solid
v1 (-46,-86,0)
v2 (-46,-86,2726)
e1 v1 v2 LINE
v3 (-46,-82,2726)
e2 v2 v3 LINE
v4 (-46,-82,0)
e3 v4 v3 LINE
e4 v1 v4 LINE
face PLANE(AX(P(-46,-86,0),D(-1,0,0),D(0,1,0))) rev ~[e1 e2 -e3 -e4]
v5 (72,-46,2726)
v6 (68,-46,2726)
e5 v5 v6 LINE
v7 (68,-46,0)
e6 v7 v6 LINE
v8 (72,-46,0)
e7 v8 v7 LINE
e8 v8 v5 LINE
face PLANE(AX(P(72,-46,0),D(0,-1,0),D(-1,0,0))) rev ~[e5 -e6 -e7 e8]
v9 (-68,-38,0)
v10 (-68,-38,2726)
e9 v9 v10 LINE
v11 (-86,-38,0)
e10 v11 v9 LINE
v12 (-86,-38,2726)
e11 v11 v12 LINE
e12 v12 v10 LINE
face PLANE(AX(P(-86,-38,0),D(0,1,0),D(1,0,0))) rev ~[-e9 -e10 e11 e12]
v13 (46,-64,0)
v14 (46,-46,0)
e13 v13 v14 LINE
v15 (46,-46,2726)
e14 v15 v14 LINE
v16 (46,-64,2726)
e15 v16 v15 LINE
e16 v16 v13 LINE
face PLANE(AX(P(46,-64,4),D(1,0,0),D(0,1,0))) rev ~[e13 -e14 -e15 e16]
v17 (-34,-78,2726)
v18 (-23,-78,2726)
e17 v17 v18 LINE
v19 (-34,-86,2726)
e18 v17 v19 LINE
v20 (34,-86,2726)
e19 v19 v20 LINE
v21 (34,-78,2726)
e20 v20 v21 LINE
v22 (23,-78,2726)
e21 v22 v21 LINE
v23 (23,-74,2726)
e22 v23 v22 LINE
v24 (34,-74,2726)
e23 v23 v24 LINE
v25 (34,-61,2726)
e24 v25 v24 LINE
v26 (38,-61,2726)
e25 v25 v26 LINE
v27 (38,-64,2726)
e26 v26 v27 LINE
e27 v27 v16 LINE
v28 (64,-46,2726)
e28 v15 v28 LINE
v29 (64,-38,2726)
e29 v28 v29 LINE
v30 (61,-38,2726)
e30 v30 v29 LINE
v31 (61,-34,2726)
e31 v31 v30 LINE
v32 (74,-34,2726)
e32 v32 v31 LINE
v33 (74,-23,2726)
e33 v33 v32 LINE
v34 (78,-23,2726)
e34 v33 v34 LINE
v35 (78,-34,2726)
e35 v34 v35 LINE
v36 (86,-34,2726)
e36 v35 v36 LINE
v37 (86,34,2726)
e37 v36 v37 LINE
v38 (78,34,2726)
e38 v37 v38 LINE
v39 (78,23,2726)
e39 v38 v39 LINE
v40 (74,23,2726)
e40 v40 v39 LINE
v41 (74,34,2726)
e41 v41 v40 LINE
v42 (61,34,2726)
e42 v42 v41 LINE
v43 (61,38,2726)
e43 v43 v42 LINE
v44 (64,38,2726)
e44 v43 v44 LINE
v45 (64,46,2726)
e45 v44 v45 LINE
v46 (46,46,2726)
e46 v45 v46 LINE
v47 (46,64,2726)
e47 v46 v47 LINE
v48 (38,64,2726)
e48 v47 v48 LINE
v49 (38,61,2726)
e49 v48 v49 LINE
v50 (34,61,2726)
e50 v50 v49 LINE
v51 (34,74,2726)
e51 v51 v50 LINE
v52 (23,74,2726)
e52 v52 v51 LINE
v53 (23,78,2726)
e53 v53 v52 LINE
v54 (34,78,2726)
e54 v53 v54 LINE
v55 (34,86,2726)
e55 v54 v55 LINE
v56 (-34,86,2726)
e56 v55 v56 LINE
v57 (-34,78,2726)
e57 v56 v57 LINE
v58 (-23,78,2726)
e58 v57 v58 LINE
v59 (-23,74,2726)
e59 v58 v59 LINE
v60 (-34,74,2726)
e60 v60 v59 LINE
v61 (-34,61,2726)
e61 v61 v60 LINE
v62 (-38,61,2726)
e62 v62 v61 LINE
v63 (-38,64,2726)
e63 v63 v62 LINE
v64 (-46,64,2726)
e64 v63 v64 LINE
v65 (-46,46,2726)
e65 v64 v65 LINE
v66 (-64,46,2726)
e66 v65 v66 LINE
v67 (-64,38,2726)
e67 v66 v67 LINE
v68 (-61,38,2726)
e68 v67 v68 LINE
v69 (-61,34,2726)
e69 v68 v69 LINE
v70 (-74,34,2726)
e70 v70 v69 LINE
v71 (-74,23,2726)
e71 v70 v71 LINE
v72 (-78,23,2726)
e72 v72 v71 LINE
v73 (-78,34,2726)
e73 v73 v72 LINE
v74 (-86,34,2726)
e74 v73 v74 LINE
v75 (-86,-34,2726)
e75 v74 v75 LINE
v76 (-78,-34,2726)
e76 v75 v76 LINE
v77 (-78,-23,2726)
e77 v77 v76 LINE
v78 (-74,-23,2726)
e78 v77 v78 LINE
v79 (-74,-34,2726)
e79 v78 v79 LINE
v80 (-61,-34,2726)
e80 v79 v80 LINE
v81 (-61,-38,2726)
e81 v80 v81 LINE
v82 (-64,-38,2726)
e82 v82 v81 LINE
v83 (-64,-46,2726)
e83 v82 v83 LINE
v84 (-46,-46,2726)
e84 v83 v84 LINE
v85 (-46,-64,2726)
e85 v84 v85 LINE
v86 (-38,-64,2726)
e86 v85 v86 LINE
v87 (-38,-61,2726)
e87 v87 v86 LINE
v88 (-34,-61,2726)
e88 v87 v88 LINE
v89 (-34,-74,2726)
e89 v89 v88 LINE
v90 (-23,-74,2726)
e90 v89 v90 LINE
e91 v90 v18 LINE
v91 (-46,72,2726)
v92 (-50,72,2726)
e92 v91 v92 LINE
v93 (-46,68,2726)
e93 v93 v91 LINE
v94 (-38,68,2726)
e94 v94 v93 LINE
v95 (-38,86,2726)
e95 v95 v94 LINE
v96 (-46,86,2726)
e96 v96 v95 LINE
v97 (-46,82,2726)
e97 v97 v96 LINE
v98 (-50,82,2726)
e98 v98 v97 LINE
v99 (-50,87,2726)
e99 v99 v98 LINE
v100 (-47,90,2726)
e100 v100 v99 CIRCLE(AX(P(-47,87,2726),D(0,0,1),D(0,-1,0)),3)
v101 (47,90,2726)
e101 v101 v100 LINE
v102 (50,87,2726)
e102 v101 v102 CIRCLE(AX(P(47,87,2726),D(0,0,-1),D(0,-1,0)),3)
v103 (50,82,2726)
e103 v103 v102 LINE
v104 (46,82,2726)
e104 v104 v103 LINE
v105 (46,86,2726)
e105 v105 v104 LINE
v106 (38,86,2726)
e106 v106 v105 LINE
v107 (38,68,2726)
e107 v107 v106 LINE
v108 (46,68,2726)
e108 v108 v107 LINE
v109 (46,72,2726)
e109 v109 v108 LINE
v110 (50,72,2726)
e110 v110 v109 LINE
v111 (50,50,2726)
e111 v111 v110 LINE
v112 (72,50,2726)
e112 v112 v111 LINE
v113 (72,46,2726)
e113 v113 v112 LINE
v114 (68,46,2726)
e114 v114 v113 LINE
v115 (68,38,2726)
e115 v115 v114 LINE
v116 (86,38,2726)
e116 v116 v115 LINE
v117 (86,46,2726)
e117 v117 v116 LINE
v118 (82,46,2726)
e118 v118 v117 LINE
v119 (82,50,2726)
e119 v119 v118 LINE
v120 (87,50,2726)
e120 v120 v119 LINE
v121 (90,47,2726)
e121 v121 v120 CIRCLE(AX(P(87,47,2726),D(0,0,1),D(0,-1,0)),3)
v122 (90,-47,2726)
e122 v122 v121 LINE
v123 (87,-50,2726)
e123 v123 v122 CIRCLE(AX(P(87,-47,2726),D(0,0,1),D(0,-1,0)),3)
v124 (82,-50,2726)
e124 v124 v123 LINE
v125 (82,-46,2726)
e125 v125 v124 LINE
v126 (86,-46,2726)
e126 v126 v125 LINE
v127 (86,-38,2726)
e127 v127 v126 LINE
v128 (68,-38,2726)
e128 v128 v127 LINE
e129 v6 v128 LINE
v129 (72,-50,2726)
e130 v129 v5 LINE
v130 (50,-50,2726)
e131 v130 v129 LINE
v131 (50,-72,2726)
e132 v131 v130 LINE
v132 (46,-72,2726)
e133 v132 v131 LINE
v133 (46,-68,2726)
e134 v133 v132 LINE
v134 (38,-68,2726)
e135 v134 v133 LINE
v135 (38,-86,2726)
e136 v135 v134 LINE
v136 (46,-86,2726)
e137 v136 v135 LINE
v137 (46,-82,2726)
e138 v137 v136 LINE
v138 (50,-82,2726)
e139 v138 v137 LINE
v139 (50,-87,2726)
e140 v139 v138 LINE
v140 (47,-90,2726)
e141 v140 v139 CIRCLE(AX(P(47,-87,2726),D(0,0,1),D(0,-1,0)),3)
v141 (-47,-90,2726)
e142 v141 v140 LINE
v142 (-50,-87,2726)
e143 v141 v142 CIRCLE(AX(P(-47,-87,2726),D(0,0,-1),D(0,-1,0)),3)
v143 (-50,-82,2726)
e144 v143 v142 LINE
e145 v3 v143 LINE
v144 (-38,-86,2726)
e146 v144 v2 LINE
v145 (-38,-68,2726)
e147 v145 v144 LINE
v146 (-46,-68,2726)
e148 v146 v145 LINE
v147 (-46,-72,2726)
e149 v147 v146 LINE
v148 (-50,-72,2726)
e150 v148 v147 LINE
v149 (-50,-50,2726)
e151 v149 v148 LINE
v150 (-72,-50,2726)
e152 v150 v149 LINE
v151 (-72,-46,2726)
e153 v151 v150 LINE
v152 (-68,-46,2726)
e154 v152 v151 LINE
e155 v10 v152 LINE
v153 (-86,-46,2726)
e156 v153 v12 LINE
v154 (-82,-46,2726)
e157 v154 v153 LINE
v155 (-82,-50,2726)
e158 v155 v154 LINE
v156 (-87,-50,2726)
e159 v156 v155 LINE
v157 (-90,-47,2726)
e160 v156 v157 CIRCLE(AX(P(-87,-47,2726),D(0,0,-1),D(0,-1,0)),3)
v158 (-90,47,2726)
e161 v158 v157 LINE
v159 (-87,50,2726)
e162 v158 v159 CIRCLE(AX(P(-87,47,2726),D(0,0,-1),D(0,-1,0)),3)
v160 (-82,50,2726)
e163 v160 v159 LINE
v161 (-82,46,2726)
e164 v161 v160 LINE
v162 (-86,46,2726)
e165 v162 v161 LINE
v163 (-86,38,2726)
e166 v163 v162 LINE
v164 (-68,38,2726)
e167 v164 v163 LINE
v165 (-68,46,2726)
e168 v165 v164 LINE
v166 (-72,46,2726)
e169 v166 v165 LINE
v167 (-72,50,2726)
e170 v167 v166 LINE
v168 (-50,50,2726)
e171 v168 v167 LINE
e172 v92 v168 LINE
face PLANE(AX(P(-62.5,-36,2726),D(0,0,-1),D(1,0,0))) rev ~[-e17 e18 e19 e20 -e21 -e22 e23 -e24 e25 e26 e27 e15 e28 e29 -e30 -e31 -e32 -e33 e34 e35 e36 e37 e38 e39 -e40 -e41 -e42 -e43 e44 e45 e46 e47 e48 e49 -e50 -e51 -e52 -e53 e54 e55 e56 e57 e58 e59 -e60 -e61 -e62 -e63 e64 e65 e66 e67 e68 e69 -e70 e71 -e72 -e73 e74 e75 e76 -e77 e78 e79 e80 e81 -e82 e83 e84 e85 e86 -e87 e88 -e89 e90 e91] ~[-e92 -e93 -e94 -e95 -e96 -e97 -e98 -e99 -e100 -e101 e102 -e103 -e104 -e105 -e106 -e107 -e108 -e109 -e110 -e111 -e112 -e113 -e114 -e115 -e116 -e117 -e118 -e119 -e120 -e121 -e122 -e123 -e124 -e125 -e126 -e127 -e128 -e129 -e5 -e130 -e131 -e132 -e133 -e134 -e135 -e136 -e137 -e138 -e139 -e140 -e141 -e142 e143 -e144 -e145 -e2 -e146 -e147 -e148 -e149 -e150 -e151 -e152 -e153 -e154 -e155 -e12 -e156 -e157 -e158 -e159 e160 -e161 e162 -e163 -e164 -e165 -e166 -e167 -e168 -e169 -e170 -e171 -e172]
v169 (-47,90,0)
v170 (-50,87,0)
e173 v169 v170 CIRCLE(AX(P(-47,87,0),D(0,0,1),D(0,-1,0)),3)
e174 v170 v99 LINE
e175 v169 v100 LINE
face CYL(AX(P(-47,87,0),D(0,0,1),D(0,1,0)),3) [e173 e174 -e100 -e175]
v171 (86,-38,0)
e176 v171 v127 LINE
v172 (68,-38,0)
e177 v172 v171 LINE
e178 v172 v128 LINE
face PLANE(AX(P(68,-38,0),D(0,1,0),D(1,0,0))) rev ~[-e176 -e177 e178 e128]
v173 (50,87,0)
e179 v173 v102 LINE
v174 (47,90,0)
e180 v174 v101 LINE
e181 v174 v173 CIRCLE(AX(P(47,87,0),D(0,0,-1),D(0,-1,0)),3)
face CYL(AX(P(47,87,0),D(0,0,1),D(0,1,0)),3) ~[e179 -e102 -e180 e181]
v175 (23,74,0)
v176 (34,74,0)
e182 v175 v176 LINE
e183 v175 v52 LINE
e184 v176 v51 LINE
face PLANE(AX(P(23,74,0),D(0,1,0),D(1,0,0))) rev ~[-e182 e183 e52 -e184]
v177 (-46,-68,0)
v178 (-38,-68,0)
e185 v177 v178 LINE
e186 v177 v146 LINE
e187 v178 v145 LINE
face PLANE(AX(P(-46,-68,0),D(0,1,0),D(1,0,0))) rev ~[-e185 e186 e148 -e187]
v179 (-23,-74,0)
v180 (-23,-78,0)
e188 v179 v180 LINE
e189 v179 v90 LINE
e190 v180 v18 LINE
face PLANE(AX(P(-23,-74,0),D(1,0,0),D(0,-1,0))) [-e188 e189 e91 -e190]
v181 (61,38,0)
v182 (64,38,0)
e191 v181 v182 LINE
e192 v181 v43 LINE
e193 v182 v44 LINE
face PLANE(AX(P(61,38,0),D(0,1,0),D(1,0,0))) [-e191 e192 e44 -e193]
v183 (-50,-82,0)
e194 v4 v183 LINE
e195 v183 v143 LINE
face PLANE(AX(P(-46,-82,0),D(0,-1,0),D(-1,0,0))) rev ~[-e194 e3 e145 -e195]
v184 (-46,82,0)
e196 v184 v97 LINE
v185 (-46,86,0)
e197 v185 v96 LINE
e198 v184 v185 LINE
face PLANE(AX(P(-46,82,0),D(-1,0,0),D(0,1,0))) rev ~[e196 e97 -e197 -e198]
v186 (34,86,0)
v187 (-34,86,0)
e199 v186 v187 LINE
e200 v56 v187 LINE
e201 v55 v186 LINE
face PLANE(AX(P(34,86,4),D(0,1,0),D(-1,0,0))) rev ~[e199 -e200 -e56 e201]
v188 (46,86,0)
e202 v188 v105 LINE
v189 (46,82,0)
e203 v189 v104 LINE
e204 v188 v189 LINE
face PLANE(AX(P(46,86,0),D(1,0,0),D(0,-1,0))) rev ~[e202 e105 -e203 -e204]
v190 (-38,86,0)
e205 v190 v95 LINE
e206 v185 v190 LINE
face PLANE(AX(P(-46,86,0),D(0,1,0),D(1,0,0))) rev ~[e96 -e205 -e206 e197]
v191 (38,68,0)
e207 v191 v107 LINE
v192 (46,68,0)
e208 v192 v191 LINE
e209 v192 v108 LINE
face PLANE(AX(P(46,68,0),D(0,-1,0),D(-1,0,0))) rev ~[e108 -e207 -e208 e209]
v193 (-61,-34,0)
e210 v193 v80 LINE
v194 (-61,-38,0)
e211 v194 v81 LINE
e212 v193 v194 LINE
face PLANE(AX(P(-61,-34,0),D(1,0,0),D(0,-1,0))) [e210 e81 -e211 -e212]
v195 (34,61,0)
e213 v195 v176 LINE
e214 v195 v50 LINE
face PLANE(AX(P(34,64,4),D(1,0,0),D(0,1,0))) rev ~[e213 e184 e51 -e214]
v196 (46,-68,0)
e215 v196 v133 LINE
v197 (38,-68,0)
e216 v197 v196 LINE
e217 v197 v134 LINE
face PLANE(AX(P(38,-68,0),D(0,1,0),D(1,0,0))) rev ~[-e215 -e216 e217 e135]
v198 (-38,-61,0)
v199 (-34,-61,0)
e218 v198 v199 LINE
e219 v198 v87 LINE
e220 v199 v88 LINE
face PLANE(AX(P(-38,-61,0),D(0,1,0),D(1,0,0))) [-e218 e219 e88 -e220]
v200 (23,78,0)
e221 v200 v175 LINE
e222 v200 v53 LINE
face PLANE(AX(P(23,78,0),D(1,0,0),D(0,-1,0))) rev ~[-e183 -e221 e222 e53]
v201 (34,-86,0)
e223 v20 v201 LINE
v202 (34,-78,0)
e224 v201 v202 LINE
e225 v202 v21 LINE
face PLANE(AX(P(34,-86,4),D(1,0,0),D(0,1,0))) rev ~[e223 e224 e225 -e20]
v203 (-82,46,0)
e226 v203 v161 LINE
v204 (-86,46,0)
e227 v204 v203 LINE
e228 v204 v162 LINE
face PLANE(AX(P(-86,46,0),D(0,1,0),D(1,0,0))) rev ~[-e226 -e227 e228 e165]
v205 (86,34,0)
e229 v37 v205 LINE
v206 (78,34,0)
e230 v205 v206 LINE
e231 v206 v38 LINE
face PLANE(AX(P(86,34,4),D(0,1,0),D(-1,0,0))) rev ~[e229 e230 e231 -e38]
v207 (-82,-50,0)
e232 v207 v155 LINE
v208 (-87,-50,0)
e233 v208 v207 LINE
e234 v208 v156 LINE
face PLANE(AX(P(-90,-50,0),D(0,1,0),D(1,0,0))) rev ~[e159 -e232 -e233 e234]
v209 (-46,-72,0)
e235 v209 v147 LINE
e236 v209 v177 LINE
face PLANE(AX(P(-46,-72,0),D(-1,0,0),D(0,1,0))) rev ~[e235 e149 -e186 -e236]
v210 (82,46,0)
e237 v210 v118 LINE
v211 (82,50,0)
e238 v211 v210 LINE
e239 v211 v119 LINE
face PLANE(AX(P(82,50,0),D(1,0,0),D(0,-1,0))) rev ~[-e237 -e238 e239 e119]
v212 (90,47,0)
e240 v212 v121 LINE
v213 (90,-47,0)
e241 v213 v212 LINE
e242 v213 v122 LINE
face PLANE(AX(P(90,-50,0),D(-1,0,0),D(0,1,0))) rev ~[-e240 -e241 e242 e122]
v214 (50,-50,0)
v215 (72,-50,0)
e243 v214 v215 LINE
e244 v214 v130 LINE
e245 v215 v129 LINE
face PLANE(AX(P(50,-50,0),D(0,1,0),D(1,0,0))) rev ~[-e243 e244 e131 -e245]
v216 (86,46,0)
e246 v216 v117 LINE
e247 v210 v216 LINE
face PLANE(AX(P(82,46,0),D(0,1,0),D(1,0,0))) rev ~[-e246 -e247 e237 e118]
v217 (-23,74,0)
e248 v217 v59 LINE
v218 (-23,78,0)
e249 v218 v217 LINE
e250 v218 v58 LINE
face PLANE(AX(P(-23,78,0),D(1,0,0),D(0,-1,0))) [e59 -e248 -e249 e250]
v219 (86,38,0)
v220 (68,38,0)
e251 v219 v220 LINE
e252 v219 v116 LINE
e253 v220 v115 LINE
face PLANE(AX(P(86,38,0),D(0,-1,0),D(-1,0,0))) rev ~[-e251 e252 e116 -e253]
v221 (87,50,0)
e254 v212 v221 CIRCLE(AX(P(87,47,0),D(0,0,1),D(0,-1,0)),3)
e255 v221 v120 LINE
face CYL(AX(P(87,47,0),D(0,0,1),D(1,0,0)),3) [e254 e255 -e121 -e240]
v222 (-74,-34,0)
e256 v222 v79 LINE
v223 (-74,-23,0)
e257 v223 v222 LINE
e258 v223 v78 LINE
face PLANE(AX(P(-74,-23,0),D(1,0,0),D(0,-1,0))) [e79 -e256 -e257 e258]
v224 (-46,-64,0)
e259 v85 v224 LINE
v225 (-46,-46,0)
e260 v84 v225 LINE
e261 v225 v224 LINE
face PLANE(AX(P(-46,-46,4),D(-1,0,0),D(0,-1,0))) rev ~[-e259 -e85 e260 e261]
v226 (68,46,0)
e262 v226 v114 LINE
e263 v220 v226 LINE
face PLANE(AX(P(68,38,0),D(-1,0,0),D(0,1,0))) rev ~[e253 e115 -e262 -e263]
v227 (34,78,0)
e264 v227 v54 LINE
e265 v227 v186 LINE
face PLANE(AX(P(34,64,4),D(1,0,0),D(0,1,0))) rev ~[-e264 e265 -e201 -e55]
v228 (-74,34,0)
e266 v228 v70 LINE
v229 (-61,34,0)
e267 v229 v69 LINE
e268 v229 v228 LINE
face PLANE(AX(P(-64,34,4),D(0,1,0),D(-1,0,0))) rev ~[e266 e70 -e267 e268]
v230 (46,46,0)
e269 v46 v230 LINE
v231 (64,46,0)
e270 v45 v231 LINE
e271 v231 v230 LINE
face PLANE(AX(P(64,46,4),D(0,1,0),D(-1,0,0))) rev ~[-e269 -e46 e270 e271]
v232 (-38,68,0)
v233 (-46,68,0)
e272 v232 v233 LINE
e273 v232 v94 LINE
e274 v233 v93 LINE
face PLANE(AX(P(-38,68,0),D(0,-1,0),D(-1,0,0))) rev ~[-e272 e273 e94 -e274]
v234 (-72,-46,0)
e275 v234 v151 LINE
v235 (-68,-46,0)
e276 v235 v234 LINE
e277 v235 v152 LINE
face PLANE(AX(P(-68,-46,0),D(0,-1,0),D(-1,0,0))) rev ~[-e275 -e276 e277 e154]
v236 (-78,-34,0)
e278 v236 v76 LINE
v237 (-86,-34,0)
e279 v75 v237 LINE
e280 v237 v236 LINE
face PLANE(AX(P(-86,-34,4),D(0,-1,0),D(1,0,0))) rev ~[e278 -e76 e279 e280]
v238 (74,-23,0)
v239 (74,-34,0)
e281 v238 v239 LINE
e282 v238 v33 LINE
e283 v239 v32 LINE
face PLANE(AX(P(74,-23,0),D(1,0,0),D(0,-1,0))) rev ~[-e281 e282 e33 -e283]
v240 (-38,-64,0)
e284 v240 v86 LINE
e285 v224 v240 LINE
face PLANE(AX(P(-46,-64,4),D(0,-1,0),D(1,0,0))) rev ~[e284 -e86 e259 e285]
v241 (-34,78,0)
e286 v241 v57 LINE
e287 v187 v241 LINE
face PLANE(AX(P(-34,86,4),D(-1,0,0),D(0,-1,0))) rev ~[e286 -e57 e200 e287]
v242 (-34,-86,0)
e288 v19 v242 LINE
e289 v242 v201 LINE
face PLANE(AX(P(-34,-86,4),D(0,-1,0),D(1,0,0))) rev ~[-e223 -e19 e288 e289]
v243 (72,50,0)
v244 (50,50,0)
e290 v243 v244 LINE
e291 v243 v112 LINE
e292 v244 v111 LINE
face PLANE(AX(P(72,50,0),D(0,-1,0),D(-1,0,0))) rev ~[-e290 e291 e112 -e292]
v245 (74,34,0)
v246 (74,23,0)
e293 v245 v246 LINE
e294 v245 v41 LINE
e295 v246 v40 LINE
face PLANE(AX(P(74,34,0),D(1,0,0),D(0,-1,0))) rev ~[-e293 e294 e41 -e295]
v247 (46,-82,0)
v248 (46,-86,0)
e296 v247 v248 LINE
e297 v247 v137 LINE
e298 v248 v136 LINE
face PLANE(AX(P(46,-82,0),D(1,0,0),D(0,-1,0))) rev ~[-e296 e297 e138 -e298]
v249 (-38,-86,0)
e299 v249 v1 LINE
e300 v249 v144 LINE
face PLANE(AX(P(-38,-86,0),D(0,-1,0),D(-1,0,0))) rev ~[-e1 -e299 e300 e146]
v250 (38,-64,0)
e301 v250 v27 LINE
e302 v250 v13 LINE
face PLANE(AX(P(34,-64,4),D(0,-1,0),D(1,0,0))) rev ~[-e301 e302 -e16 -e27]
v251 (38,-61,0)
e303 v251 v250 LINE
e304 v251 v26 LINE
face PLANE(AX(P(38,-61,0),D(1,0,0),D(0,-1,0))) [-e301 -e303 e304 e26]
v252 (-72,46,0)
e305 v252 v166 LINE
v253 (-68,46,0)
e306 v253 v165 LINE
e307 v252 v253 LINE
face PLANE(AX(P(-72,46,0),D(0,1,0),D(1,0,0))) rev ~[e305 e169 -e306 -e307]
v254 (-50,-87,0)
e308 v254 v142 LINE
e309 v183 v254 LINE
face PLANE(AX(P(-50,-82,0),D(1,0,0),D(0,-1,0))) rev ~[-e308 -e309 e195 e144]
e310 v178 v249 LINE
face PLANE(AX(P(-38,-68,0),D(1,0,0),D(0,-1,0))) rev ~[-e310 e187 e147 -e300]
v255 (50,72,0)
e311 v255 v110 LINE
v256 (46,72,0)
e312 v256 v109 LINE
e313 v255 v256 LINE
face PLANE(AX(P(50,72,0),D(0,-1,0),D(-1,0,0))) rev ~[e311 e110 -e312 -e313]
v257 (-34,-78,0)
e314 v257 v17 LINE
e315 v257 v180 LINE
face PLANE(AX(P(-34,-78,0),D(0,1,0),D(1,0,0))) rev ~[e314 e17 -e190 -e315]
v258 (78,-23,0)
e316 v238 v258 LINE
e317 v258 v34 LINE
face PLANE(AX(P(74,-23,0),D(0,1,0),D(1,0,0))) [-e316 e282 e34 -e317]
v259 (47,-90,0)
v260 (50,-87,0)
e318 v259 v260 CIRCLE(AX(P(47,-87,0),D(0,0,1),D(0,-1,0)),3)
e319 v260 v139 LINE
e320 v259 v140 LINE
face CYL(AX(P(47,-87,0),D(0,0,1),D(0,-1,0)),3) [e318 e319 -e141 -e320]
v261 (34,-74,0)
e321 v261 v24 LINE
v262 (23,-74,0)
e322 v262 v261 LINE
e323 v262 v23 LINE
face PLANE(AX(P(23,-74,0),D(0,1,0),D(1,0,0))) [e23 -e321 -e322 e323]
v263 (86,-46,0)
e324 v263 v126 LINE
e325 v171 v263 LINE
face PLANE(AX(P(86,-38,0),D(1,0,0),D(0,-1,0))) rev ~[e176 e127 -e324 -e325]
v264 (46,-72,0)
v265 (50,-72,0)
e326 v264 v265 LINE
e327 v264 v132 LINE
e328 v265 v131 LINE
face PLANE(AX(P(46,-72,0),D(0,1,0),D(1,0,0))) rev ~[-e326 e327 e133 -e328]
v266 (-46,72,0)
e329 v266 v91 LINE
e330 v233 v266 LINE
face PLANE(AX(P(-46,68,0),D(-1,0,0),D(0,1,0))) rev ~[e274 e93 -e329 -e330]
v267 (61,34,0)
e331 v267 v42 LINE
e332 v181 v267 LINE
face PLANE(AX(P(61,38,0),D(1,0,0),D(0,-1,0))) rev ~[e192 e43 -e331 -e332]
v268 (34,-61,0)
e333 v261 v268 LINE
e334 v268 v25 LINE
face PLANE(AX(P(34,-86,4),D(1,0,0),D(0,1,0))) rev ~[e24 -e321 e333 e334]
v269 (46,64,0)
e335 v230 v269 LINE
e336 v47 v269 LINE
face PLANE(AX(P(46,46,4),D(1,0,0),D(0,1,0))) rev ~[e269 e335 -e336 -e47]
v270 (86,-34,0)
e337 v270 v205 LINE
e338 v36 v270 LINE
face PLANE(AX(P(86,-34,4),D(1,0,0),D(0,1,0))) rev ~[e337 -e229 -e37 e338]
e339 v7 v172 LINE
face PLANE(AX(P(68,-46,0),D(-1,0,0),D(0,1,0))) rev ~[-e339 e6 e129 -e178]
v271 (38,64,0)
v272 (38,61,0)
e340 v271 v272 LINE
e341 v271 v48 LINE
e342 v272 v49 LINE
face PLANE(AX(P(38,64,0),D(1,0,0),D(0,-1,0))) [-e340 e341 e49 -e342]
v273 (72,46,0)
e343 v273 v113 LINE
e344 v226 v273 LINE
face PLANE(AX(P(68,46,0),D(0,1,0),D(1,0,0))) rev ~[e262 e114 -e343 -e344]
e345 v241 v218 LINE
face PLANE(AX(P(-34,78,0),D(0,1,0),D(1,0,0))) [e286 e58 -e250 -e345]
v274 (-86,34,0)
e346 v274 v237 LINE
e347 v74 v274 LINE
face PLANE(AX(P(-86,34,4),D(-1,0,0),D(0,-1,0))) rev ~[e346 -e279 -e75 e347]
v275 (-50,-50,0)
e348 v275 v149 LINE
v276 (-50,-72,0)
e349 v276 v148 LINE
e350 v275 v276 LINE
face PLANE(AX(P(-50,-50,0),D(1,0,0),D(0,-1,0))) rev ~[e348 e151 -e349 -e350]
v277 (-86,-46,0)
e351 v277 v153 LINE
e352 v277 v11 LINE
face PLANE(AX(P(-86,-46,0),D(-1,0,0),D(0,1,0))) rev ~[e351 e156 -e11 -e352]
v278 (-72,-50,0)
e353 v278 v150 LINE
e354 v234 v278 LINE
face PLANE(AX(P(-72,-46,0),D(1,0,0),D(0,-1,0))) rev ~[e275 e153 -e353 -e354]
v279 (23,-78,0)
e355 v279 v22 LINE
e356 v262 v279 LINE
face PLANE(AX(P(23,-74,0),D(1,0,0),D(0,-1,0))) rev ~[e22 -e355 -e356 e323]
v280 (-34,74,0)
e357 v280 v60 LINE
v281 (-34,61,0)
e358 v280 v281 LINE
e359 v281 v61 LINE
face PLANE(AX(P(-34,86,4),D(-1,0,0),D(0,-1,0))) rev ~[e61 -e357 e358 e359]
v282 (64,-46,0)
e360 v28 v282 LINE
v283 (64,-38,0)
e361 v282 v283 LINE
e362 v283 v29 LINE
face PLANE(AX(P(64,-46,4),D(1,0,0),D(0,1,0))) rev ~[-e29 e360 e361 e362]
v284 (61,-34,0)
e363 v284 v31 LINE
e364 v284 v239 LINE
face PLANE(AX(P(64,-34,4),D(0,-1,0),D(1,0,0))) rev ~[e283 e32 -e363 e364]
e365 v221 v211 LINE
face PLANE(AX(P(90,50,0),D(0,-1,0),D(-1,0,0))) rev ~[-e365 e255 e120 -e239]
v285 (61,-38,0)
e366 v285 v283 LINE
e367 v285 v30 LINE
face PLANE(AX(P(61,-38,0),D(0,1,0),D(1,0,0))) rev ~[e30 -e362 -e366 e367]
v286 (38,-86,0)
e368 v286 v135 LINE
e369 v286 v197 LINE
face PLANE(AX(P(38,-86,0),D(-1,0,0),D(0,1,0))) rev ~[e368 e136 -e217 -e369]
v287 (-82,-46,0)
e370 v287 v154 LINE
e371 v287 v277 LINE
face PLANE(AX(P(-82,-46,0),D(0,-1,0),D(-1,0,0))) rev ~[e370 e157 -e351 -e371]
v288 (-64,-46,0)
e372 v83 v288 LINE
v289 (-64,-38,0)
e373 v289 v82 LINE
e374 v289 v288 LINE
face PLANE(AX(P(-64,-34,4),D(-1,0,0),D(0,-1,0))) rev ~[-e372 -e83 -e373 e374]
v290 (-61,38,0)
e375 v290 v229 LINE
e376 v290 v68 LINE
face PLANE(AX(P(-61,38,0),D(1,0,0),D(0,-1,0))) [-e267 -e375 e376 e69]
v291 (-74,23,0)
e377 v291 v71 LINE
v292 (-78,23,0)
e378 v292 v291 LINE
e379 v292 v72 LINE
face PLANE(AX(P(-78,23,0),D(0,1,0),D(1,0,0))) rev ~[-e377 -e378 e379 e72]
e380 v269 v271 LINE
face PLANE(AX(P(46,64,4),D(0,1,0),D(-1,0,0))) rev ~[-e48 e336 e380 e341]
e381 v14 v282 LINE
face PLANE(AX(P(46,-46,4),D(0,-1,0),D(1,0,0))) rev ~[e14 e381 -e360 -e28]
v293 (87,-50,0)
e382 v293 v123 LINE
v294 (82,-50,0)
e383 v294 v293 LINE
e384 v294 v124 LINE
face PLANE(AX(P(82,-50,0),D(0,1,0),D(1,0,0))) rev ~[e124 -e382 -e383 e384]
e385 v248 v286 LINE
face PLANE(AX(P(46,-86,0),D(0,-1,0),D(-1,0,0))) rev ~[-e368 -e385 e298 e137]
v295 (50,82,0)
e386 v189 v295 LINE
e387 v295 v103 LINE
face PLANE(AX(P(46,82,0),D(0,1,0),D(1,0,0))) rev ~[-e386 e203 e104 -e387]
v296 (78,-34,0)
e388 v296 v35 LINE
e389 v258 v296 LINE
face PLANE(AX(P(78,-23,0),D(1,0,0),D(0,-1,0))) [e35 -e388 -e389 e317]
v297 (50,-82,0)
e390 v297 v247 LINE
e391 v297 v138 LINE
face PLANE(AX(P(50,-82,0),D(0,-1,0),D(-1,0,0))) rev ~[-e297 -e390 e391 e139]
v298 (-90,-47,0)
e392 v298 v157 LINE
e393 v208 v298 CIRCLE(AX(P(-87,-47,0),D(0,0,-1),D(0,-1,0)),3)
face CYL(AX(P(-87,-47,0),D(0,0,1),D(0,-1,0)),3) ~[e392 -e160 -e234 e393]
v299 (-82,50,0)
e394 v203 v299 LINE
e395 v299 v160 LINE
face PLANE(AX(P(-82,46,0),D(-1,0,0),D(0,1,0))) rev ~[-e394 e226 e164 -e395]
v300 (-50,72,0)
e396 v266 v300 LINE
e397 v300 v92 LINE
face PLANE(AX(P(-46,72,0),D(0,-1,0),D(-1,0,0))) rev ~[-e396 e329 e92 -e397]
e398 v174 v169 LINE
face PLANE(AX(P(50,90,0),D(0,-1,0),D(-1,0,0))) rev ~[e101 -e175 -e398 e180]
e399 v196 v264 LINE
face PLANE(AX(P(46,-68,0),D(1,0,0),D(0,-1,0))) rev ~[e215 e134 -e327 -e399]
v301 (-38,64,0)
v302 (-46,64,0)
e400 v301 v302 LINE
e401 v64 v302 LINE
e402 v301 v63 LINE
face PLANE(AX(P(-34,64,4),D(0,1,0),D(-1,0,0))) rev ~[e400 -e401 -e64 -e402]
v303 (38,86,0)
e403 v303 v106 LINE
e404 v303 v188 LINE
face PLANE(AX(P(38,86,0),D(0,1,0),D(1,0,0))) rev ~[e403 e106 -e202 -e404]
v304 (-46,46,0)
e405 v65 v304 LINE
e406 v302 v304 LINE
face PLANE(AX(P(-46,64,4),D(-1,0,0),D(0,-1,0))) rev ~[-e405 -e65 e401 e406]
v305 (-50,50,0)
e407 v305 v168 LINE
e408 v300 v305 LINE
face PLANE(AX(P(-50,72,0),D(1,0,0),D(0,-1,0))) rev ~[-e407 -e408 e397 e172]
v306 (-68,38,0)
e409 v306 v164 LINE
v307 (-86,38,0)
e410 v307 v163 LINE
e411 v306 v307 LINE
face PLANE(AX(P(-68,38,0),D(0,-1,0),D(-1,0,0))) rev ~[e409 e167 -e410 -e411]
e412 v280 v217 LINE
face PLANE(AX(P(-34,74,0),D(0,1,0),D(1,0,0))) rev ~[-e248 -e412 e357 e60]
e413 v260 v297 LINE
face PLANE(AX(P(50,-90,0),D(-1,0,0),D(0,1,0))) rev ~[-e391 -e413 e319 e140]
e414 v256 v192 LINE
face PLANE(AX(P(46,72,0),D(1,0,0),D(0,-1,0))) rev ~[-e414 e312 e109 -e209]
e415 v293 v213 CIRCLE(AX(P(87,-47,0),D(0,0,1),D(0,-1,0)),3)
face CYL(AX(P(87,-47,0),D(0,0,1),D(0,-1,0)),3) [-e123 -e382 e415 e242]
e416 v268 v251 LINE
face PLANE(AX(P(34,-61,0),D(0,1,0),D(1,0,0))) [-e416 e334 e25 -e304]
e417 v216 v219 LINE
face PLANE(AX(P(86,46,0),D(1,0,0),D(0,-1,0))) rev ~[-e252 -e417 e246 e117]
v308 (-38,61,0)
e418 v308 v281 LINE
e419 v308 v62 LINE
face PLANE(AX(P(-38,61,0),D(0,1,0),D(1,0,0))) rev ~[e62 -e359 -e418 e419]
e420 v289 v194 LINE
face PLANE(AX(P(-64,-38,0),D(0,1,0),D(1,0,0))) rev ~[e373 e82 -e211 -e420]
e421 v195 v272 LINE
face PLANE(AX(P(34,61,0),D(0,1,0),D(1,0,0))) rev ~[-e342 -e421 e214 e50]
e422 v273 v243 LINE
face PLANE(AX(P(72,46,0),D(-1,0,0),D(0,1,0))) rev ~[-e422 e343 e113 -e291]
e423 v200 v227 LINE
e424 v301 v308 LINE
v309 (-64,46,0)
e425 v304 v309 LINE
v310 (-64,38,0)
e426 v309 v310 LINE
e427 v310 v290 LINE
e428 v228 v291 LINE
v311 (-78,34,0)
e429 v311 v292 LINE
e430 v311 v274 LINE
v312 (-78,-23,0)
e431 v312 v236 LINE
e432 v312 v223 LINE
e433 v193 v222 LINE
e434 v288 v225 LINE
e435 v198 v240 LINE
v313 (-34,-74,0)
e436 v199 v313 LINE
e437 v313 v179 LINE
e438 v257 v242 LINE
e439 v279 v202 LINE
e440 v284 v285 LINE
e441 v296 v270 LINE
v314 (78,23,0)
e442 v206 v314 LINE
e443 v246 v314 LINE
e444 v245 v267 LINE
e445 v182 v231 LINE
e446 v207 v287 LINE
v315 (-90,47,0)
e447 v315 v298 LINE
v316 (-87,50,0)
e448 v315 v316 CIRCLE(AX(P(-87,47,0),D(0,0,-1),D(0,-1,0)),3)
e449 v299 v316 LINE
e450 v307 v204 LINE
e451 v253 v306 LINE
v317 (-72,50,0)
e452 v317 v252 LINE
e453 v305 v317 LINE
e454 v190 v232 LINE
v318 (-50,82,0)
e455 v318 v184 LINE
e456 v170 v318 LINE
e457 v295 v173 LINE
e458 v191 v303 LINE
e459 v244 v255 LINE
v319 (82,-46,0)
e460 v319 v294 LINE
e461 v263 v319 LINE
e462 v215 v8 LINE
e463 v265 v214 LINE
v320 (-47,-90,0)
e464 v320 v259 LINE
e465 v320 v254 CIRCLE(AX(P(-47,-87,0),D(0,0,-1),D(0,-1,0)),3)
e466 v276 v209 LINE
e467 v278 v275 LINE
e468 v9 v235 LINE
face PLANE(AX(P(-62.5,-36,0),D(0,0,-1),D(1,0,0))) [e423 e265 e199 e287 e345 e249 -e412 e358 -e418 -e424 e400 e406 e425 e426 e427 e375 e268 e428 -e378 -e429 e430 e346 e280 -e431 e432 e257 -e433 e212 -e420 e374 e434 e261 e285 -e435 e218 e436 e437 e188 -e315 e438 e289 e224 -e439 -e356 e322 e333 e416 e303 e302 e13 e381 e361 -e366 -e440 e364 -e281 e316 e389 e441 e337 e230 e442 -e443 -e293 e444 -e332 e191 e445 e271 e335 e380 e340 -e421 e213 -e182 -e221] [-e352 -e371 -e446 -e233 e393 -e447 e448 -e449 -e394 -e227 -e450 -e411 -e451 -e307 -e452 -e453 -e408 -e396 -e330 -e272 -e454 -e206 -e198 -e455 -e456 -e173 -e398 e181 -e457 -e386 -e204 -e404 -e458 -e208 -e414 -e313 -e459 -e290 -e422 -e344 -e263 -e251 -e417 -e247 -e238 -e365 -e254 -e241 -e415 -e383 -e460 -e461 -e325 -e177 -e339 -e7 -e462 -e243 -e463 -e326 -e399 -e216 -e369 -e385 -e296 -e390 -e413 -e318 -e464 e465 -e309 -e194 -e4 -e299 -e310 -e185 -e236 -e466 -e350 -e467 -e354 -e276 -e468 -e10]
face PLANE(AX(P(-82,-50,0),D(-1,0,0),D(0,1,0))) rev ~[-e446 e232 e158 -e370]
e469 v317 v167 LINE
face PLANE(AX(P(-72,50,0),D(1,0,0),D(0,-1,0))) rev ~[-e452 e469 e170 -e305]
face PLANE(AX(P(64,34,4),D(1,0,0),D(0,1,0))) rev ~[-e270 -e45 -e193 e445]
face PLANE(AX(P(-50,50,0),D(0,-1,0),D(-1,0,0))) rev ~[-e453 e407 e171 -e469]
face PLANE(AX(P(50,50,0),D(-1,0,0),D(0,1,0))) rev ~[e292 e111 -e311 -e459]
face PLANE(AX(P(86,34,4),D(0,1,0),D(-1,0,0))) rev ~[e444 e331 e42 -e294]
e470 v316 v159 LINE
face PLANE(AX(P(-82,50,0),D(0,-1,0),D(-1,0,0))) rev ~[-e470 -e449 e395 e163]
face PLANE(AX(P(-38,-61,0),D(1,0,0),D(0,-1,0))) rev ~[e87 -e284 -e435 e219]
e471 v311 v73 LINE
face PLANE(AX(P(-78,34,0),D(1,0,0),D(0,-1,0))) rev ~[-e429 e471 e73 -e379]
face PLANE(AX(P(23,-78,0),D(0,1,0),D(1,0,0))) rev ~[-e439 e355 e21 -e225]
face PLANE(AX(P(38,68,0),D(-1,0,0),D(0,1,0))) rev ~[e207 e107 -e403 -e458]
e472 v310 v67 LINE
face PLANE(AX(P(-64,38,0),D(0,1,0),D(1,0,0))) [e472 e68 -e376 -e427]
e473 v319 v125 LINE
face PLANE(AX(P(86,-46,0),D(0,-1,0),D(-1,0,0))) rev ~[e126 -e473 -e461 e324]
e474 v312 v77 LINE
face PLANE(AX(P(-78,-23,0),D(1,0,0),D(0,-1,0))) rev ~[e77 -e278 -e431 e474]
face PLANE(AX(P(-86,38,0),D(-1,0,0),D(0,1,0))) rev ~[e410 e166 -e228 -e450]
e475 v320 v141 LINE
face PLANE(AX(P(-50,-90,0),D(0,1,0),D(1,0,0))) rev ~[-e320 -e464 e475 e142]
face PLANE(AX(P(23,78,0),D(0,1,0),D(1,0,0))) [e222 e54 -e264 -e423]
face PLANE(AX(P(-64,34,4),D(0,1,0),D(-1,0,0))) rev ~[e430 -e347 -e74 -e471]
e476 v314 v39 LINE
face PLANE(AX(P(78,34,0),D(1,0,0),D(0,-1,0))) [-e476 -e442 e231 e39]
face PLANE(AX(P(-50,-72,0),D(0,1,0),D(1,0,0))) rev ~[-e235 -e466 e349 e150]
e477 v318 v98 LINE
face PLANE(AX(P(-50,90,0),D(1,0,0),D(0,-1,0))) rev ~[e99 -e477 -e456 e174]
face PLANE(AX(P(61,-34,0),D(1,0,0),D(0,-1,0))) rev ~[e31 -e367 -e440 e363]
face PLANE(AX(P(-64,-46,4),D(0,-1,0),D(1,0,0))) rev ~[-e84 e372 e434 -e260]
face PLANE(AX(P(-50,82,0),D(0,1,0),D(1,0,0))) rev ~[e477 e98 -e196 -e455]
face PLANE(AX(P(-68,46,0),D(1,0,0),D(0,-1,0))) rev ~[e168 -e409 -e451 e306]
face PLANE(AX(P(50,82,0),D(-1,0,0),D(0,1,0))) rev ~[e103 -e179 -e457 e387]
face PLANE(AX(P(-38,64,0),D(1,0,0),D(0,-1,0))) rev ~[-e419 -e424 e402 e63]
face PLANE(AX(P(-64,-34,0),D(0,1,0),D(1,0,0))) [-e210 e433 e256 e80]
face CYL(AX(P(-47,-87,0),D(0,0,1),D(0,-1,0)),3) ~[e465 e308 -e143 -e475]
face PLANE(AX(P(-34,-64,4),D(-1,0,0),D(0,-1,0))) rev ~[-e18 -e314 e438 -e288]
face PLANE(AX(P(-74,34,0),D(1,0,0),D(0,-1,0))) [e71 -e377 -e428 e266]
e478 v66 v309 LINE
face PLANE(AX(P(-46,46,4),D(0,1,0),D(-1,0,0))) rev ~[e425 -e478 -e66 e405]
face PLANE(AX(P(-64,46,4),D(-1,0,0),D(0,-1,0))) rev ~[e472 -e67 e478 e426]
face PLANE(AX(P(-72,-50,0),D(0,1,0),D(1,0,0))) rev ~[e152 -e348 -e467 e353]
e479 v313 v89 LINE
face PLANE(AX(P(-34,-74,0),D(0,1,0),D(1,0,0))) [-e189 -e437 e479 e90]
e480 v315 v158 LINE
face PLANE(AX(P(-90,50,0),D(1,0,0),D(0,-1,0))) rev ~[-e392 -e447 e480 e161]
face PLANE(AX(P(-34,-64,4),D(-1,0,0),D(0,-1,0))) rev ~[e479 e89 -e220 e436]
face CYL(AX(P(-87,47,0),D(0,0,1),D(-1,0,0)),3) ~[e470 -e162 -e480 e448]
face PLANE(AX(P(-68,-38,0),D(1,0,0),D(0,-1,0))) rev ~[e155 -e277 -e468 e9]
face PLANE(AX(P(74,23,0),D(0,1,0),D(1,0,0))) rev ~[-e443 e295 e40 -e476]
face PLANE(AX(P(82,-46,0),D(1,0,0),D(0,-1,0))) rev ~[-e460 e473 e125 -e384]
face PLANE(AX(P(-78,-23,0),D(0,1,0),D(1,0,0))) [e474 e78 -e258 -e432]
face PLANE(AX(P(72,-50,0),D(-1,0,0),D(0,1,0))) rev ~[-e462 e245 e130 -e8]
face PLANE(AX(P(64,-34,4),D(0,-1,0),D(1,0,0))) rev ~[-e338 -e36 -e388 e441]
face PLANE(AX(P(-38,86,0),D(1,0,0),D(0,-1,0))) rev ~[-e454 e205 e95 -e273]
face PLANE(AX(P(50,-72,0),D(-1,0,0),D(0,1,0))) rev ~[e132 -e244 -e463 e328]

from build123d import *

# Parameters (mm, degrees)
F1_DEPTH = 2726
F2_T     = -4
F3_R     = 3
F4_W     = 3
F4_H     = 4
F4_W_2   = 4
F4_H_2   = 11
F4_W_3   = 11
F4_H_3   = 3
F5_DEPTH = 2726


# Not quite as in the source:
# - a shell that OpenCascade refuses in one call is made with other operations: the cavity is built on its own and cut out


with BuildPart() as f1:
    # F0 (on Top) → F1 (new body)
    with BuildSketch(Plane.XY):
        Polygon((50, 90), (-50, 90), (-50, 82), (-46, 82), (-46, 86), (-38, 86), (-38, 68), (-46, 68), (-46, 72), (-50, 72), (-50, 50), (-72, 50), (-72, 46), (-68, 46), (-68, 38), (-86, 38), (-86, 46), (-82, 46), (-82, 50), (-90, 50), (-90, -50), (-82, -50), (-82, -46), (-86, -46), (-86, -38), (-68, -38), (-68, -46), (-72, -46), (-72, -50), (-50, -50), (-50, -72), (-46, -72), (-46, -68), (-38, -68), (-38, -86), (-46, -86), (-46, -82), (-50, -82), (-50, -90), (50, -90), (50, -82), (46, -82), (46, -86), (38, -86), (38, -68), (46, -68), (46, -72), (50, -72), (50, -50), (72, -50), (72, -46), (68, -46), (68, -38), (86, -38), (86, -46), (82, -46), (82, -50), (90, -50), (90, 50), (82, 50), (82, 46), (86, 46), (86, 38), (68, 38), (68, 46), (72, 46), (72, 50), (50, 50), (50, 72), (46, 72), (46, 68), (38, 68), (38, 86), (46, 86), (46, 82), (50, 82), align=None)
    extrude(amount=F1_DEPTH)

    # F2: a shell. OpenCascade refuses it in one call, so the cavity is built on its own and cut out:
    # the body offset inwards by the wall thickness, plus a prism from it out through each open face.
    f2_core = offset(f1.part, amount=F2_T, kind=Kind.INTERSECTION, mode=Mode.PRIVATE)
    f2_exits = [f2_core.faces().sort_by_distance(p)[0] for p in [
        (0, 0, 2722),
        (0, 0, 4),
    ]]
    add(f2_core, mode=Mode.SUBTRACT)
    extrude(f2_exits, amount=-F2_T, mode=Mode.SUBTRACT)

    # F3
    f3_edges = [f1.edges().sort_by_distance(p)[0] for p in [
        (-50, -90, 1363),
        (-90, -50, 1363),
        (50, -90, 1363),
        (90, -50, 1363),
        (90, 50, 1363),
        (50, 90, 1363),
        (-50, 90, 1363),
        (-90, 50, 1363),
    ]]
    fillet(f3_edges, radius=F3_R)

    # F4 (on face) → F5 (join, through all)
    with BuildSketch(Plane(origin=(0, 0, 0), x_dir=(1, 0, 0), z_dir=(0, 0, -1))):
        with Locations((-62.5, 36)):
            Rectangle(F4_W, F4_H)
        with Locations((-76, 28.5)):
            Rectangle(F4_W_2, F4_H_2)
        with Locations((62.5, 36)):
            Rectangle(F4_W, F4_H)
        with Locations((76, 28.5)):
            Rectangle(F4_W_2, F4_H_2)
        with Locations((76, -28.5)):
            Rectangle(F4_W_2, F4_H_2)
        with Locations((62.5, -36)):
            Rectangle(F4_W, F4_H)
        with Locations((-62.5, -36)):
            Rectangle(F4_W, F4_H)
        with Locations((-76, -28.5)):
            Rectangle(F4_W_2, F4_H_2)
        with Locations((-28.5, 76)):
            Rectangle(F4_W_3, F4_H)
        with Locations((-36, 62.5)):
            Rectangle(F4_W_2, F4_H_3)
        with Locations((28.5, 76)):
            Rectangle(F4_W_3, F4_H)
        with Locations((36, 62.5)):
            Rectangle(F4_W_2, F4_H_3)
        with Locations((-28.5, -76)):
            Rectangle(F4_W_3, F4_H)
        with Locations((36, -62.5)):
            Rectangle(F4_W_2, F4_H_3)
        with Locations((-36, -62.5)):
            Rectangle(F4_W_2, F4_H_3)
        with Locations((28.5, -76)):
            Rectangle(F4_W_3, F4_H)
    extrude(amount=-F5_DEPTH)


solid = f1.part
